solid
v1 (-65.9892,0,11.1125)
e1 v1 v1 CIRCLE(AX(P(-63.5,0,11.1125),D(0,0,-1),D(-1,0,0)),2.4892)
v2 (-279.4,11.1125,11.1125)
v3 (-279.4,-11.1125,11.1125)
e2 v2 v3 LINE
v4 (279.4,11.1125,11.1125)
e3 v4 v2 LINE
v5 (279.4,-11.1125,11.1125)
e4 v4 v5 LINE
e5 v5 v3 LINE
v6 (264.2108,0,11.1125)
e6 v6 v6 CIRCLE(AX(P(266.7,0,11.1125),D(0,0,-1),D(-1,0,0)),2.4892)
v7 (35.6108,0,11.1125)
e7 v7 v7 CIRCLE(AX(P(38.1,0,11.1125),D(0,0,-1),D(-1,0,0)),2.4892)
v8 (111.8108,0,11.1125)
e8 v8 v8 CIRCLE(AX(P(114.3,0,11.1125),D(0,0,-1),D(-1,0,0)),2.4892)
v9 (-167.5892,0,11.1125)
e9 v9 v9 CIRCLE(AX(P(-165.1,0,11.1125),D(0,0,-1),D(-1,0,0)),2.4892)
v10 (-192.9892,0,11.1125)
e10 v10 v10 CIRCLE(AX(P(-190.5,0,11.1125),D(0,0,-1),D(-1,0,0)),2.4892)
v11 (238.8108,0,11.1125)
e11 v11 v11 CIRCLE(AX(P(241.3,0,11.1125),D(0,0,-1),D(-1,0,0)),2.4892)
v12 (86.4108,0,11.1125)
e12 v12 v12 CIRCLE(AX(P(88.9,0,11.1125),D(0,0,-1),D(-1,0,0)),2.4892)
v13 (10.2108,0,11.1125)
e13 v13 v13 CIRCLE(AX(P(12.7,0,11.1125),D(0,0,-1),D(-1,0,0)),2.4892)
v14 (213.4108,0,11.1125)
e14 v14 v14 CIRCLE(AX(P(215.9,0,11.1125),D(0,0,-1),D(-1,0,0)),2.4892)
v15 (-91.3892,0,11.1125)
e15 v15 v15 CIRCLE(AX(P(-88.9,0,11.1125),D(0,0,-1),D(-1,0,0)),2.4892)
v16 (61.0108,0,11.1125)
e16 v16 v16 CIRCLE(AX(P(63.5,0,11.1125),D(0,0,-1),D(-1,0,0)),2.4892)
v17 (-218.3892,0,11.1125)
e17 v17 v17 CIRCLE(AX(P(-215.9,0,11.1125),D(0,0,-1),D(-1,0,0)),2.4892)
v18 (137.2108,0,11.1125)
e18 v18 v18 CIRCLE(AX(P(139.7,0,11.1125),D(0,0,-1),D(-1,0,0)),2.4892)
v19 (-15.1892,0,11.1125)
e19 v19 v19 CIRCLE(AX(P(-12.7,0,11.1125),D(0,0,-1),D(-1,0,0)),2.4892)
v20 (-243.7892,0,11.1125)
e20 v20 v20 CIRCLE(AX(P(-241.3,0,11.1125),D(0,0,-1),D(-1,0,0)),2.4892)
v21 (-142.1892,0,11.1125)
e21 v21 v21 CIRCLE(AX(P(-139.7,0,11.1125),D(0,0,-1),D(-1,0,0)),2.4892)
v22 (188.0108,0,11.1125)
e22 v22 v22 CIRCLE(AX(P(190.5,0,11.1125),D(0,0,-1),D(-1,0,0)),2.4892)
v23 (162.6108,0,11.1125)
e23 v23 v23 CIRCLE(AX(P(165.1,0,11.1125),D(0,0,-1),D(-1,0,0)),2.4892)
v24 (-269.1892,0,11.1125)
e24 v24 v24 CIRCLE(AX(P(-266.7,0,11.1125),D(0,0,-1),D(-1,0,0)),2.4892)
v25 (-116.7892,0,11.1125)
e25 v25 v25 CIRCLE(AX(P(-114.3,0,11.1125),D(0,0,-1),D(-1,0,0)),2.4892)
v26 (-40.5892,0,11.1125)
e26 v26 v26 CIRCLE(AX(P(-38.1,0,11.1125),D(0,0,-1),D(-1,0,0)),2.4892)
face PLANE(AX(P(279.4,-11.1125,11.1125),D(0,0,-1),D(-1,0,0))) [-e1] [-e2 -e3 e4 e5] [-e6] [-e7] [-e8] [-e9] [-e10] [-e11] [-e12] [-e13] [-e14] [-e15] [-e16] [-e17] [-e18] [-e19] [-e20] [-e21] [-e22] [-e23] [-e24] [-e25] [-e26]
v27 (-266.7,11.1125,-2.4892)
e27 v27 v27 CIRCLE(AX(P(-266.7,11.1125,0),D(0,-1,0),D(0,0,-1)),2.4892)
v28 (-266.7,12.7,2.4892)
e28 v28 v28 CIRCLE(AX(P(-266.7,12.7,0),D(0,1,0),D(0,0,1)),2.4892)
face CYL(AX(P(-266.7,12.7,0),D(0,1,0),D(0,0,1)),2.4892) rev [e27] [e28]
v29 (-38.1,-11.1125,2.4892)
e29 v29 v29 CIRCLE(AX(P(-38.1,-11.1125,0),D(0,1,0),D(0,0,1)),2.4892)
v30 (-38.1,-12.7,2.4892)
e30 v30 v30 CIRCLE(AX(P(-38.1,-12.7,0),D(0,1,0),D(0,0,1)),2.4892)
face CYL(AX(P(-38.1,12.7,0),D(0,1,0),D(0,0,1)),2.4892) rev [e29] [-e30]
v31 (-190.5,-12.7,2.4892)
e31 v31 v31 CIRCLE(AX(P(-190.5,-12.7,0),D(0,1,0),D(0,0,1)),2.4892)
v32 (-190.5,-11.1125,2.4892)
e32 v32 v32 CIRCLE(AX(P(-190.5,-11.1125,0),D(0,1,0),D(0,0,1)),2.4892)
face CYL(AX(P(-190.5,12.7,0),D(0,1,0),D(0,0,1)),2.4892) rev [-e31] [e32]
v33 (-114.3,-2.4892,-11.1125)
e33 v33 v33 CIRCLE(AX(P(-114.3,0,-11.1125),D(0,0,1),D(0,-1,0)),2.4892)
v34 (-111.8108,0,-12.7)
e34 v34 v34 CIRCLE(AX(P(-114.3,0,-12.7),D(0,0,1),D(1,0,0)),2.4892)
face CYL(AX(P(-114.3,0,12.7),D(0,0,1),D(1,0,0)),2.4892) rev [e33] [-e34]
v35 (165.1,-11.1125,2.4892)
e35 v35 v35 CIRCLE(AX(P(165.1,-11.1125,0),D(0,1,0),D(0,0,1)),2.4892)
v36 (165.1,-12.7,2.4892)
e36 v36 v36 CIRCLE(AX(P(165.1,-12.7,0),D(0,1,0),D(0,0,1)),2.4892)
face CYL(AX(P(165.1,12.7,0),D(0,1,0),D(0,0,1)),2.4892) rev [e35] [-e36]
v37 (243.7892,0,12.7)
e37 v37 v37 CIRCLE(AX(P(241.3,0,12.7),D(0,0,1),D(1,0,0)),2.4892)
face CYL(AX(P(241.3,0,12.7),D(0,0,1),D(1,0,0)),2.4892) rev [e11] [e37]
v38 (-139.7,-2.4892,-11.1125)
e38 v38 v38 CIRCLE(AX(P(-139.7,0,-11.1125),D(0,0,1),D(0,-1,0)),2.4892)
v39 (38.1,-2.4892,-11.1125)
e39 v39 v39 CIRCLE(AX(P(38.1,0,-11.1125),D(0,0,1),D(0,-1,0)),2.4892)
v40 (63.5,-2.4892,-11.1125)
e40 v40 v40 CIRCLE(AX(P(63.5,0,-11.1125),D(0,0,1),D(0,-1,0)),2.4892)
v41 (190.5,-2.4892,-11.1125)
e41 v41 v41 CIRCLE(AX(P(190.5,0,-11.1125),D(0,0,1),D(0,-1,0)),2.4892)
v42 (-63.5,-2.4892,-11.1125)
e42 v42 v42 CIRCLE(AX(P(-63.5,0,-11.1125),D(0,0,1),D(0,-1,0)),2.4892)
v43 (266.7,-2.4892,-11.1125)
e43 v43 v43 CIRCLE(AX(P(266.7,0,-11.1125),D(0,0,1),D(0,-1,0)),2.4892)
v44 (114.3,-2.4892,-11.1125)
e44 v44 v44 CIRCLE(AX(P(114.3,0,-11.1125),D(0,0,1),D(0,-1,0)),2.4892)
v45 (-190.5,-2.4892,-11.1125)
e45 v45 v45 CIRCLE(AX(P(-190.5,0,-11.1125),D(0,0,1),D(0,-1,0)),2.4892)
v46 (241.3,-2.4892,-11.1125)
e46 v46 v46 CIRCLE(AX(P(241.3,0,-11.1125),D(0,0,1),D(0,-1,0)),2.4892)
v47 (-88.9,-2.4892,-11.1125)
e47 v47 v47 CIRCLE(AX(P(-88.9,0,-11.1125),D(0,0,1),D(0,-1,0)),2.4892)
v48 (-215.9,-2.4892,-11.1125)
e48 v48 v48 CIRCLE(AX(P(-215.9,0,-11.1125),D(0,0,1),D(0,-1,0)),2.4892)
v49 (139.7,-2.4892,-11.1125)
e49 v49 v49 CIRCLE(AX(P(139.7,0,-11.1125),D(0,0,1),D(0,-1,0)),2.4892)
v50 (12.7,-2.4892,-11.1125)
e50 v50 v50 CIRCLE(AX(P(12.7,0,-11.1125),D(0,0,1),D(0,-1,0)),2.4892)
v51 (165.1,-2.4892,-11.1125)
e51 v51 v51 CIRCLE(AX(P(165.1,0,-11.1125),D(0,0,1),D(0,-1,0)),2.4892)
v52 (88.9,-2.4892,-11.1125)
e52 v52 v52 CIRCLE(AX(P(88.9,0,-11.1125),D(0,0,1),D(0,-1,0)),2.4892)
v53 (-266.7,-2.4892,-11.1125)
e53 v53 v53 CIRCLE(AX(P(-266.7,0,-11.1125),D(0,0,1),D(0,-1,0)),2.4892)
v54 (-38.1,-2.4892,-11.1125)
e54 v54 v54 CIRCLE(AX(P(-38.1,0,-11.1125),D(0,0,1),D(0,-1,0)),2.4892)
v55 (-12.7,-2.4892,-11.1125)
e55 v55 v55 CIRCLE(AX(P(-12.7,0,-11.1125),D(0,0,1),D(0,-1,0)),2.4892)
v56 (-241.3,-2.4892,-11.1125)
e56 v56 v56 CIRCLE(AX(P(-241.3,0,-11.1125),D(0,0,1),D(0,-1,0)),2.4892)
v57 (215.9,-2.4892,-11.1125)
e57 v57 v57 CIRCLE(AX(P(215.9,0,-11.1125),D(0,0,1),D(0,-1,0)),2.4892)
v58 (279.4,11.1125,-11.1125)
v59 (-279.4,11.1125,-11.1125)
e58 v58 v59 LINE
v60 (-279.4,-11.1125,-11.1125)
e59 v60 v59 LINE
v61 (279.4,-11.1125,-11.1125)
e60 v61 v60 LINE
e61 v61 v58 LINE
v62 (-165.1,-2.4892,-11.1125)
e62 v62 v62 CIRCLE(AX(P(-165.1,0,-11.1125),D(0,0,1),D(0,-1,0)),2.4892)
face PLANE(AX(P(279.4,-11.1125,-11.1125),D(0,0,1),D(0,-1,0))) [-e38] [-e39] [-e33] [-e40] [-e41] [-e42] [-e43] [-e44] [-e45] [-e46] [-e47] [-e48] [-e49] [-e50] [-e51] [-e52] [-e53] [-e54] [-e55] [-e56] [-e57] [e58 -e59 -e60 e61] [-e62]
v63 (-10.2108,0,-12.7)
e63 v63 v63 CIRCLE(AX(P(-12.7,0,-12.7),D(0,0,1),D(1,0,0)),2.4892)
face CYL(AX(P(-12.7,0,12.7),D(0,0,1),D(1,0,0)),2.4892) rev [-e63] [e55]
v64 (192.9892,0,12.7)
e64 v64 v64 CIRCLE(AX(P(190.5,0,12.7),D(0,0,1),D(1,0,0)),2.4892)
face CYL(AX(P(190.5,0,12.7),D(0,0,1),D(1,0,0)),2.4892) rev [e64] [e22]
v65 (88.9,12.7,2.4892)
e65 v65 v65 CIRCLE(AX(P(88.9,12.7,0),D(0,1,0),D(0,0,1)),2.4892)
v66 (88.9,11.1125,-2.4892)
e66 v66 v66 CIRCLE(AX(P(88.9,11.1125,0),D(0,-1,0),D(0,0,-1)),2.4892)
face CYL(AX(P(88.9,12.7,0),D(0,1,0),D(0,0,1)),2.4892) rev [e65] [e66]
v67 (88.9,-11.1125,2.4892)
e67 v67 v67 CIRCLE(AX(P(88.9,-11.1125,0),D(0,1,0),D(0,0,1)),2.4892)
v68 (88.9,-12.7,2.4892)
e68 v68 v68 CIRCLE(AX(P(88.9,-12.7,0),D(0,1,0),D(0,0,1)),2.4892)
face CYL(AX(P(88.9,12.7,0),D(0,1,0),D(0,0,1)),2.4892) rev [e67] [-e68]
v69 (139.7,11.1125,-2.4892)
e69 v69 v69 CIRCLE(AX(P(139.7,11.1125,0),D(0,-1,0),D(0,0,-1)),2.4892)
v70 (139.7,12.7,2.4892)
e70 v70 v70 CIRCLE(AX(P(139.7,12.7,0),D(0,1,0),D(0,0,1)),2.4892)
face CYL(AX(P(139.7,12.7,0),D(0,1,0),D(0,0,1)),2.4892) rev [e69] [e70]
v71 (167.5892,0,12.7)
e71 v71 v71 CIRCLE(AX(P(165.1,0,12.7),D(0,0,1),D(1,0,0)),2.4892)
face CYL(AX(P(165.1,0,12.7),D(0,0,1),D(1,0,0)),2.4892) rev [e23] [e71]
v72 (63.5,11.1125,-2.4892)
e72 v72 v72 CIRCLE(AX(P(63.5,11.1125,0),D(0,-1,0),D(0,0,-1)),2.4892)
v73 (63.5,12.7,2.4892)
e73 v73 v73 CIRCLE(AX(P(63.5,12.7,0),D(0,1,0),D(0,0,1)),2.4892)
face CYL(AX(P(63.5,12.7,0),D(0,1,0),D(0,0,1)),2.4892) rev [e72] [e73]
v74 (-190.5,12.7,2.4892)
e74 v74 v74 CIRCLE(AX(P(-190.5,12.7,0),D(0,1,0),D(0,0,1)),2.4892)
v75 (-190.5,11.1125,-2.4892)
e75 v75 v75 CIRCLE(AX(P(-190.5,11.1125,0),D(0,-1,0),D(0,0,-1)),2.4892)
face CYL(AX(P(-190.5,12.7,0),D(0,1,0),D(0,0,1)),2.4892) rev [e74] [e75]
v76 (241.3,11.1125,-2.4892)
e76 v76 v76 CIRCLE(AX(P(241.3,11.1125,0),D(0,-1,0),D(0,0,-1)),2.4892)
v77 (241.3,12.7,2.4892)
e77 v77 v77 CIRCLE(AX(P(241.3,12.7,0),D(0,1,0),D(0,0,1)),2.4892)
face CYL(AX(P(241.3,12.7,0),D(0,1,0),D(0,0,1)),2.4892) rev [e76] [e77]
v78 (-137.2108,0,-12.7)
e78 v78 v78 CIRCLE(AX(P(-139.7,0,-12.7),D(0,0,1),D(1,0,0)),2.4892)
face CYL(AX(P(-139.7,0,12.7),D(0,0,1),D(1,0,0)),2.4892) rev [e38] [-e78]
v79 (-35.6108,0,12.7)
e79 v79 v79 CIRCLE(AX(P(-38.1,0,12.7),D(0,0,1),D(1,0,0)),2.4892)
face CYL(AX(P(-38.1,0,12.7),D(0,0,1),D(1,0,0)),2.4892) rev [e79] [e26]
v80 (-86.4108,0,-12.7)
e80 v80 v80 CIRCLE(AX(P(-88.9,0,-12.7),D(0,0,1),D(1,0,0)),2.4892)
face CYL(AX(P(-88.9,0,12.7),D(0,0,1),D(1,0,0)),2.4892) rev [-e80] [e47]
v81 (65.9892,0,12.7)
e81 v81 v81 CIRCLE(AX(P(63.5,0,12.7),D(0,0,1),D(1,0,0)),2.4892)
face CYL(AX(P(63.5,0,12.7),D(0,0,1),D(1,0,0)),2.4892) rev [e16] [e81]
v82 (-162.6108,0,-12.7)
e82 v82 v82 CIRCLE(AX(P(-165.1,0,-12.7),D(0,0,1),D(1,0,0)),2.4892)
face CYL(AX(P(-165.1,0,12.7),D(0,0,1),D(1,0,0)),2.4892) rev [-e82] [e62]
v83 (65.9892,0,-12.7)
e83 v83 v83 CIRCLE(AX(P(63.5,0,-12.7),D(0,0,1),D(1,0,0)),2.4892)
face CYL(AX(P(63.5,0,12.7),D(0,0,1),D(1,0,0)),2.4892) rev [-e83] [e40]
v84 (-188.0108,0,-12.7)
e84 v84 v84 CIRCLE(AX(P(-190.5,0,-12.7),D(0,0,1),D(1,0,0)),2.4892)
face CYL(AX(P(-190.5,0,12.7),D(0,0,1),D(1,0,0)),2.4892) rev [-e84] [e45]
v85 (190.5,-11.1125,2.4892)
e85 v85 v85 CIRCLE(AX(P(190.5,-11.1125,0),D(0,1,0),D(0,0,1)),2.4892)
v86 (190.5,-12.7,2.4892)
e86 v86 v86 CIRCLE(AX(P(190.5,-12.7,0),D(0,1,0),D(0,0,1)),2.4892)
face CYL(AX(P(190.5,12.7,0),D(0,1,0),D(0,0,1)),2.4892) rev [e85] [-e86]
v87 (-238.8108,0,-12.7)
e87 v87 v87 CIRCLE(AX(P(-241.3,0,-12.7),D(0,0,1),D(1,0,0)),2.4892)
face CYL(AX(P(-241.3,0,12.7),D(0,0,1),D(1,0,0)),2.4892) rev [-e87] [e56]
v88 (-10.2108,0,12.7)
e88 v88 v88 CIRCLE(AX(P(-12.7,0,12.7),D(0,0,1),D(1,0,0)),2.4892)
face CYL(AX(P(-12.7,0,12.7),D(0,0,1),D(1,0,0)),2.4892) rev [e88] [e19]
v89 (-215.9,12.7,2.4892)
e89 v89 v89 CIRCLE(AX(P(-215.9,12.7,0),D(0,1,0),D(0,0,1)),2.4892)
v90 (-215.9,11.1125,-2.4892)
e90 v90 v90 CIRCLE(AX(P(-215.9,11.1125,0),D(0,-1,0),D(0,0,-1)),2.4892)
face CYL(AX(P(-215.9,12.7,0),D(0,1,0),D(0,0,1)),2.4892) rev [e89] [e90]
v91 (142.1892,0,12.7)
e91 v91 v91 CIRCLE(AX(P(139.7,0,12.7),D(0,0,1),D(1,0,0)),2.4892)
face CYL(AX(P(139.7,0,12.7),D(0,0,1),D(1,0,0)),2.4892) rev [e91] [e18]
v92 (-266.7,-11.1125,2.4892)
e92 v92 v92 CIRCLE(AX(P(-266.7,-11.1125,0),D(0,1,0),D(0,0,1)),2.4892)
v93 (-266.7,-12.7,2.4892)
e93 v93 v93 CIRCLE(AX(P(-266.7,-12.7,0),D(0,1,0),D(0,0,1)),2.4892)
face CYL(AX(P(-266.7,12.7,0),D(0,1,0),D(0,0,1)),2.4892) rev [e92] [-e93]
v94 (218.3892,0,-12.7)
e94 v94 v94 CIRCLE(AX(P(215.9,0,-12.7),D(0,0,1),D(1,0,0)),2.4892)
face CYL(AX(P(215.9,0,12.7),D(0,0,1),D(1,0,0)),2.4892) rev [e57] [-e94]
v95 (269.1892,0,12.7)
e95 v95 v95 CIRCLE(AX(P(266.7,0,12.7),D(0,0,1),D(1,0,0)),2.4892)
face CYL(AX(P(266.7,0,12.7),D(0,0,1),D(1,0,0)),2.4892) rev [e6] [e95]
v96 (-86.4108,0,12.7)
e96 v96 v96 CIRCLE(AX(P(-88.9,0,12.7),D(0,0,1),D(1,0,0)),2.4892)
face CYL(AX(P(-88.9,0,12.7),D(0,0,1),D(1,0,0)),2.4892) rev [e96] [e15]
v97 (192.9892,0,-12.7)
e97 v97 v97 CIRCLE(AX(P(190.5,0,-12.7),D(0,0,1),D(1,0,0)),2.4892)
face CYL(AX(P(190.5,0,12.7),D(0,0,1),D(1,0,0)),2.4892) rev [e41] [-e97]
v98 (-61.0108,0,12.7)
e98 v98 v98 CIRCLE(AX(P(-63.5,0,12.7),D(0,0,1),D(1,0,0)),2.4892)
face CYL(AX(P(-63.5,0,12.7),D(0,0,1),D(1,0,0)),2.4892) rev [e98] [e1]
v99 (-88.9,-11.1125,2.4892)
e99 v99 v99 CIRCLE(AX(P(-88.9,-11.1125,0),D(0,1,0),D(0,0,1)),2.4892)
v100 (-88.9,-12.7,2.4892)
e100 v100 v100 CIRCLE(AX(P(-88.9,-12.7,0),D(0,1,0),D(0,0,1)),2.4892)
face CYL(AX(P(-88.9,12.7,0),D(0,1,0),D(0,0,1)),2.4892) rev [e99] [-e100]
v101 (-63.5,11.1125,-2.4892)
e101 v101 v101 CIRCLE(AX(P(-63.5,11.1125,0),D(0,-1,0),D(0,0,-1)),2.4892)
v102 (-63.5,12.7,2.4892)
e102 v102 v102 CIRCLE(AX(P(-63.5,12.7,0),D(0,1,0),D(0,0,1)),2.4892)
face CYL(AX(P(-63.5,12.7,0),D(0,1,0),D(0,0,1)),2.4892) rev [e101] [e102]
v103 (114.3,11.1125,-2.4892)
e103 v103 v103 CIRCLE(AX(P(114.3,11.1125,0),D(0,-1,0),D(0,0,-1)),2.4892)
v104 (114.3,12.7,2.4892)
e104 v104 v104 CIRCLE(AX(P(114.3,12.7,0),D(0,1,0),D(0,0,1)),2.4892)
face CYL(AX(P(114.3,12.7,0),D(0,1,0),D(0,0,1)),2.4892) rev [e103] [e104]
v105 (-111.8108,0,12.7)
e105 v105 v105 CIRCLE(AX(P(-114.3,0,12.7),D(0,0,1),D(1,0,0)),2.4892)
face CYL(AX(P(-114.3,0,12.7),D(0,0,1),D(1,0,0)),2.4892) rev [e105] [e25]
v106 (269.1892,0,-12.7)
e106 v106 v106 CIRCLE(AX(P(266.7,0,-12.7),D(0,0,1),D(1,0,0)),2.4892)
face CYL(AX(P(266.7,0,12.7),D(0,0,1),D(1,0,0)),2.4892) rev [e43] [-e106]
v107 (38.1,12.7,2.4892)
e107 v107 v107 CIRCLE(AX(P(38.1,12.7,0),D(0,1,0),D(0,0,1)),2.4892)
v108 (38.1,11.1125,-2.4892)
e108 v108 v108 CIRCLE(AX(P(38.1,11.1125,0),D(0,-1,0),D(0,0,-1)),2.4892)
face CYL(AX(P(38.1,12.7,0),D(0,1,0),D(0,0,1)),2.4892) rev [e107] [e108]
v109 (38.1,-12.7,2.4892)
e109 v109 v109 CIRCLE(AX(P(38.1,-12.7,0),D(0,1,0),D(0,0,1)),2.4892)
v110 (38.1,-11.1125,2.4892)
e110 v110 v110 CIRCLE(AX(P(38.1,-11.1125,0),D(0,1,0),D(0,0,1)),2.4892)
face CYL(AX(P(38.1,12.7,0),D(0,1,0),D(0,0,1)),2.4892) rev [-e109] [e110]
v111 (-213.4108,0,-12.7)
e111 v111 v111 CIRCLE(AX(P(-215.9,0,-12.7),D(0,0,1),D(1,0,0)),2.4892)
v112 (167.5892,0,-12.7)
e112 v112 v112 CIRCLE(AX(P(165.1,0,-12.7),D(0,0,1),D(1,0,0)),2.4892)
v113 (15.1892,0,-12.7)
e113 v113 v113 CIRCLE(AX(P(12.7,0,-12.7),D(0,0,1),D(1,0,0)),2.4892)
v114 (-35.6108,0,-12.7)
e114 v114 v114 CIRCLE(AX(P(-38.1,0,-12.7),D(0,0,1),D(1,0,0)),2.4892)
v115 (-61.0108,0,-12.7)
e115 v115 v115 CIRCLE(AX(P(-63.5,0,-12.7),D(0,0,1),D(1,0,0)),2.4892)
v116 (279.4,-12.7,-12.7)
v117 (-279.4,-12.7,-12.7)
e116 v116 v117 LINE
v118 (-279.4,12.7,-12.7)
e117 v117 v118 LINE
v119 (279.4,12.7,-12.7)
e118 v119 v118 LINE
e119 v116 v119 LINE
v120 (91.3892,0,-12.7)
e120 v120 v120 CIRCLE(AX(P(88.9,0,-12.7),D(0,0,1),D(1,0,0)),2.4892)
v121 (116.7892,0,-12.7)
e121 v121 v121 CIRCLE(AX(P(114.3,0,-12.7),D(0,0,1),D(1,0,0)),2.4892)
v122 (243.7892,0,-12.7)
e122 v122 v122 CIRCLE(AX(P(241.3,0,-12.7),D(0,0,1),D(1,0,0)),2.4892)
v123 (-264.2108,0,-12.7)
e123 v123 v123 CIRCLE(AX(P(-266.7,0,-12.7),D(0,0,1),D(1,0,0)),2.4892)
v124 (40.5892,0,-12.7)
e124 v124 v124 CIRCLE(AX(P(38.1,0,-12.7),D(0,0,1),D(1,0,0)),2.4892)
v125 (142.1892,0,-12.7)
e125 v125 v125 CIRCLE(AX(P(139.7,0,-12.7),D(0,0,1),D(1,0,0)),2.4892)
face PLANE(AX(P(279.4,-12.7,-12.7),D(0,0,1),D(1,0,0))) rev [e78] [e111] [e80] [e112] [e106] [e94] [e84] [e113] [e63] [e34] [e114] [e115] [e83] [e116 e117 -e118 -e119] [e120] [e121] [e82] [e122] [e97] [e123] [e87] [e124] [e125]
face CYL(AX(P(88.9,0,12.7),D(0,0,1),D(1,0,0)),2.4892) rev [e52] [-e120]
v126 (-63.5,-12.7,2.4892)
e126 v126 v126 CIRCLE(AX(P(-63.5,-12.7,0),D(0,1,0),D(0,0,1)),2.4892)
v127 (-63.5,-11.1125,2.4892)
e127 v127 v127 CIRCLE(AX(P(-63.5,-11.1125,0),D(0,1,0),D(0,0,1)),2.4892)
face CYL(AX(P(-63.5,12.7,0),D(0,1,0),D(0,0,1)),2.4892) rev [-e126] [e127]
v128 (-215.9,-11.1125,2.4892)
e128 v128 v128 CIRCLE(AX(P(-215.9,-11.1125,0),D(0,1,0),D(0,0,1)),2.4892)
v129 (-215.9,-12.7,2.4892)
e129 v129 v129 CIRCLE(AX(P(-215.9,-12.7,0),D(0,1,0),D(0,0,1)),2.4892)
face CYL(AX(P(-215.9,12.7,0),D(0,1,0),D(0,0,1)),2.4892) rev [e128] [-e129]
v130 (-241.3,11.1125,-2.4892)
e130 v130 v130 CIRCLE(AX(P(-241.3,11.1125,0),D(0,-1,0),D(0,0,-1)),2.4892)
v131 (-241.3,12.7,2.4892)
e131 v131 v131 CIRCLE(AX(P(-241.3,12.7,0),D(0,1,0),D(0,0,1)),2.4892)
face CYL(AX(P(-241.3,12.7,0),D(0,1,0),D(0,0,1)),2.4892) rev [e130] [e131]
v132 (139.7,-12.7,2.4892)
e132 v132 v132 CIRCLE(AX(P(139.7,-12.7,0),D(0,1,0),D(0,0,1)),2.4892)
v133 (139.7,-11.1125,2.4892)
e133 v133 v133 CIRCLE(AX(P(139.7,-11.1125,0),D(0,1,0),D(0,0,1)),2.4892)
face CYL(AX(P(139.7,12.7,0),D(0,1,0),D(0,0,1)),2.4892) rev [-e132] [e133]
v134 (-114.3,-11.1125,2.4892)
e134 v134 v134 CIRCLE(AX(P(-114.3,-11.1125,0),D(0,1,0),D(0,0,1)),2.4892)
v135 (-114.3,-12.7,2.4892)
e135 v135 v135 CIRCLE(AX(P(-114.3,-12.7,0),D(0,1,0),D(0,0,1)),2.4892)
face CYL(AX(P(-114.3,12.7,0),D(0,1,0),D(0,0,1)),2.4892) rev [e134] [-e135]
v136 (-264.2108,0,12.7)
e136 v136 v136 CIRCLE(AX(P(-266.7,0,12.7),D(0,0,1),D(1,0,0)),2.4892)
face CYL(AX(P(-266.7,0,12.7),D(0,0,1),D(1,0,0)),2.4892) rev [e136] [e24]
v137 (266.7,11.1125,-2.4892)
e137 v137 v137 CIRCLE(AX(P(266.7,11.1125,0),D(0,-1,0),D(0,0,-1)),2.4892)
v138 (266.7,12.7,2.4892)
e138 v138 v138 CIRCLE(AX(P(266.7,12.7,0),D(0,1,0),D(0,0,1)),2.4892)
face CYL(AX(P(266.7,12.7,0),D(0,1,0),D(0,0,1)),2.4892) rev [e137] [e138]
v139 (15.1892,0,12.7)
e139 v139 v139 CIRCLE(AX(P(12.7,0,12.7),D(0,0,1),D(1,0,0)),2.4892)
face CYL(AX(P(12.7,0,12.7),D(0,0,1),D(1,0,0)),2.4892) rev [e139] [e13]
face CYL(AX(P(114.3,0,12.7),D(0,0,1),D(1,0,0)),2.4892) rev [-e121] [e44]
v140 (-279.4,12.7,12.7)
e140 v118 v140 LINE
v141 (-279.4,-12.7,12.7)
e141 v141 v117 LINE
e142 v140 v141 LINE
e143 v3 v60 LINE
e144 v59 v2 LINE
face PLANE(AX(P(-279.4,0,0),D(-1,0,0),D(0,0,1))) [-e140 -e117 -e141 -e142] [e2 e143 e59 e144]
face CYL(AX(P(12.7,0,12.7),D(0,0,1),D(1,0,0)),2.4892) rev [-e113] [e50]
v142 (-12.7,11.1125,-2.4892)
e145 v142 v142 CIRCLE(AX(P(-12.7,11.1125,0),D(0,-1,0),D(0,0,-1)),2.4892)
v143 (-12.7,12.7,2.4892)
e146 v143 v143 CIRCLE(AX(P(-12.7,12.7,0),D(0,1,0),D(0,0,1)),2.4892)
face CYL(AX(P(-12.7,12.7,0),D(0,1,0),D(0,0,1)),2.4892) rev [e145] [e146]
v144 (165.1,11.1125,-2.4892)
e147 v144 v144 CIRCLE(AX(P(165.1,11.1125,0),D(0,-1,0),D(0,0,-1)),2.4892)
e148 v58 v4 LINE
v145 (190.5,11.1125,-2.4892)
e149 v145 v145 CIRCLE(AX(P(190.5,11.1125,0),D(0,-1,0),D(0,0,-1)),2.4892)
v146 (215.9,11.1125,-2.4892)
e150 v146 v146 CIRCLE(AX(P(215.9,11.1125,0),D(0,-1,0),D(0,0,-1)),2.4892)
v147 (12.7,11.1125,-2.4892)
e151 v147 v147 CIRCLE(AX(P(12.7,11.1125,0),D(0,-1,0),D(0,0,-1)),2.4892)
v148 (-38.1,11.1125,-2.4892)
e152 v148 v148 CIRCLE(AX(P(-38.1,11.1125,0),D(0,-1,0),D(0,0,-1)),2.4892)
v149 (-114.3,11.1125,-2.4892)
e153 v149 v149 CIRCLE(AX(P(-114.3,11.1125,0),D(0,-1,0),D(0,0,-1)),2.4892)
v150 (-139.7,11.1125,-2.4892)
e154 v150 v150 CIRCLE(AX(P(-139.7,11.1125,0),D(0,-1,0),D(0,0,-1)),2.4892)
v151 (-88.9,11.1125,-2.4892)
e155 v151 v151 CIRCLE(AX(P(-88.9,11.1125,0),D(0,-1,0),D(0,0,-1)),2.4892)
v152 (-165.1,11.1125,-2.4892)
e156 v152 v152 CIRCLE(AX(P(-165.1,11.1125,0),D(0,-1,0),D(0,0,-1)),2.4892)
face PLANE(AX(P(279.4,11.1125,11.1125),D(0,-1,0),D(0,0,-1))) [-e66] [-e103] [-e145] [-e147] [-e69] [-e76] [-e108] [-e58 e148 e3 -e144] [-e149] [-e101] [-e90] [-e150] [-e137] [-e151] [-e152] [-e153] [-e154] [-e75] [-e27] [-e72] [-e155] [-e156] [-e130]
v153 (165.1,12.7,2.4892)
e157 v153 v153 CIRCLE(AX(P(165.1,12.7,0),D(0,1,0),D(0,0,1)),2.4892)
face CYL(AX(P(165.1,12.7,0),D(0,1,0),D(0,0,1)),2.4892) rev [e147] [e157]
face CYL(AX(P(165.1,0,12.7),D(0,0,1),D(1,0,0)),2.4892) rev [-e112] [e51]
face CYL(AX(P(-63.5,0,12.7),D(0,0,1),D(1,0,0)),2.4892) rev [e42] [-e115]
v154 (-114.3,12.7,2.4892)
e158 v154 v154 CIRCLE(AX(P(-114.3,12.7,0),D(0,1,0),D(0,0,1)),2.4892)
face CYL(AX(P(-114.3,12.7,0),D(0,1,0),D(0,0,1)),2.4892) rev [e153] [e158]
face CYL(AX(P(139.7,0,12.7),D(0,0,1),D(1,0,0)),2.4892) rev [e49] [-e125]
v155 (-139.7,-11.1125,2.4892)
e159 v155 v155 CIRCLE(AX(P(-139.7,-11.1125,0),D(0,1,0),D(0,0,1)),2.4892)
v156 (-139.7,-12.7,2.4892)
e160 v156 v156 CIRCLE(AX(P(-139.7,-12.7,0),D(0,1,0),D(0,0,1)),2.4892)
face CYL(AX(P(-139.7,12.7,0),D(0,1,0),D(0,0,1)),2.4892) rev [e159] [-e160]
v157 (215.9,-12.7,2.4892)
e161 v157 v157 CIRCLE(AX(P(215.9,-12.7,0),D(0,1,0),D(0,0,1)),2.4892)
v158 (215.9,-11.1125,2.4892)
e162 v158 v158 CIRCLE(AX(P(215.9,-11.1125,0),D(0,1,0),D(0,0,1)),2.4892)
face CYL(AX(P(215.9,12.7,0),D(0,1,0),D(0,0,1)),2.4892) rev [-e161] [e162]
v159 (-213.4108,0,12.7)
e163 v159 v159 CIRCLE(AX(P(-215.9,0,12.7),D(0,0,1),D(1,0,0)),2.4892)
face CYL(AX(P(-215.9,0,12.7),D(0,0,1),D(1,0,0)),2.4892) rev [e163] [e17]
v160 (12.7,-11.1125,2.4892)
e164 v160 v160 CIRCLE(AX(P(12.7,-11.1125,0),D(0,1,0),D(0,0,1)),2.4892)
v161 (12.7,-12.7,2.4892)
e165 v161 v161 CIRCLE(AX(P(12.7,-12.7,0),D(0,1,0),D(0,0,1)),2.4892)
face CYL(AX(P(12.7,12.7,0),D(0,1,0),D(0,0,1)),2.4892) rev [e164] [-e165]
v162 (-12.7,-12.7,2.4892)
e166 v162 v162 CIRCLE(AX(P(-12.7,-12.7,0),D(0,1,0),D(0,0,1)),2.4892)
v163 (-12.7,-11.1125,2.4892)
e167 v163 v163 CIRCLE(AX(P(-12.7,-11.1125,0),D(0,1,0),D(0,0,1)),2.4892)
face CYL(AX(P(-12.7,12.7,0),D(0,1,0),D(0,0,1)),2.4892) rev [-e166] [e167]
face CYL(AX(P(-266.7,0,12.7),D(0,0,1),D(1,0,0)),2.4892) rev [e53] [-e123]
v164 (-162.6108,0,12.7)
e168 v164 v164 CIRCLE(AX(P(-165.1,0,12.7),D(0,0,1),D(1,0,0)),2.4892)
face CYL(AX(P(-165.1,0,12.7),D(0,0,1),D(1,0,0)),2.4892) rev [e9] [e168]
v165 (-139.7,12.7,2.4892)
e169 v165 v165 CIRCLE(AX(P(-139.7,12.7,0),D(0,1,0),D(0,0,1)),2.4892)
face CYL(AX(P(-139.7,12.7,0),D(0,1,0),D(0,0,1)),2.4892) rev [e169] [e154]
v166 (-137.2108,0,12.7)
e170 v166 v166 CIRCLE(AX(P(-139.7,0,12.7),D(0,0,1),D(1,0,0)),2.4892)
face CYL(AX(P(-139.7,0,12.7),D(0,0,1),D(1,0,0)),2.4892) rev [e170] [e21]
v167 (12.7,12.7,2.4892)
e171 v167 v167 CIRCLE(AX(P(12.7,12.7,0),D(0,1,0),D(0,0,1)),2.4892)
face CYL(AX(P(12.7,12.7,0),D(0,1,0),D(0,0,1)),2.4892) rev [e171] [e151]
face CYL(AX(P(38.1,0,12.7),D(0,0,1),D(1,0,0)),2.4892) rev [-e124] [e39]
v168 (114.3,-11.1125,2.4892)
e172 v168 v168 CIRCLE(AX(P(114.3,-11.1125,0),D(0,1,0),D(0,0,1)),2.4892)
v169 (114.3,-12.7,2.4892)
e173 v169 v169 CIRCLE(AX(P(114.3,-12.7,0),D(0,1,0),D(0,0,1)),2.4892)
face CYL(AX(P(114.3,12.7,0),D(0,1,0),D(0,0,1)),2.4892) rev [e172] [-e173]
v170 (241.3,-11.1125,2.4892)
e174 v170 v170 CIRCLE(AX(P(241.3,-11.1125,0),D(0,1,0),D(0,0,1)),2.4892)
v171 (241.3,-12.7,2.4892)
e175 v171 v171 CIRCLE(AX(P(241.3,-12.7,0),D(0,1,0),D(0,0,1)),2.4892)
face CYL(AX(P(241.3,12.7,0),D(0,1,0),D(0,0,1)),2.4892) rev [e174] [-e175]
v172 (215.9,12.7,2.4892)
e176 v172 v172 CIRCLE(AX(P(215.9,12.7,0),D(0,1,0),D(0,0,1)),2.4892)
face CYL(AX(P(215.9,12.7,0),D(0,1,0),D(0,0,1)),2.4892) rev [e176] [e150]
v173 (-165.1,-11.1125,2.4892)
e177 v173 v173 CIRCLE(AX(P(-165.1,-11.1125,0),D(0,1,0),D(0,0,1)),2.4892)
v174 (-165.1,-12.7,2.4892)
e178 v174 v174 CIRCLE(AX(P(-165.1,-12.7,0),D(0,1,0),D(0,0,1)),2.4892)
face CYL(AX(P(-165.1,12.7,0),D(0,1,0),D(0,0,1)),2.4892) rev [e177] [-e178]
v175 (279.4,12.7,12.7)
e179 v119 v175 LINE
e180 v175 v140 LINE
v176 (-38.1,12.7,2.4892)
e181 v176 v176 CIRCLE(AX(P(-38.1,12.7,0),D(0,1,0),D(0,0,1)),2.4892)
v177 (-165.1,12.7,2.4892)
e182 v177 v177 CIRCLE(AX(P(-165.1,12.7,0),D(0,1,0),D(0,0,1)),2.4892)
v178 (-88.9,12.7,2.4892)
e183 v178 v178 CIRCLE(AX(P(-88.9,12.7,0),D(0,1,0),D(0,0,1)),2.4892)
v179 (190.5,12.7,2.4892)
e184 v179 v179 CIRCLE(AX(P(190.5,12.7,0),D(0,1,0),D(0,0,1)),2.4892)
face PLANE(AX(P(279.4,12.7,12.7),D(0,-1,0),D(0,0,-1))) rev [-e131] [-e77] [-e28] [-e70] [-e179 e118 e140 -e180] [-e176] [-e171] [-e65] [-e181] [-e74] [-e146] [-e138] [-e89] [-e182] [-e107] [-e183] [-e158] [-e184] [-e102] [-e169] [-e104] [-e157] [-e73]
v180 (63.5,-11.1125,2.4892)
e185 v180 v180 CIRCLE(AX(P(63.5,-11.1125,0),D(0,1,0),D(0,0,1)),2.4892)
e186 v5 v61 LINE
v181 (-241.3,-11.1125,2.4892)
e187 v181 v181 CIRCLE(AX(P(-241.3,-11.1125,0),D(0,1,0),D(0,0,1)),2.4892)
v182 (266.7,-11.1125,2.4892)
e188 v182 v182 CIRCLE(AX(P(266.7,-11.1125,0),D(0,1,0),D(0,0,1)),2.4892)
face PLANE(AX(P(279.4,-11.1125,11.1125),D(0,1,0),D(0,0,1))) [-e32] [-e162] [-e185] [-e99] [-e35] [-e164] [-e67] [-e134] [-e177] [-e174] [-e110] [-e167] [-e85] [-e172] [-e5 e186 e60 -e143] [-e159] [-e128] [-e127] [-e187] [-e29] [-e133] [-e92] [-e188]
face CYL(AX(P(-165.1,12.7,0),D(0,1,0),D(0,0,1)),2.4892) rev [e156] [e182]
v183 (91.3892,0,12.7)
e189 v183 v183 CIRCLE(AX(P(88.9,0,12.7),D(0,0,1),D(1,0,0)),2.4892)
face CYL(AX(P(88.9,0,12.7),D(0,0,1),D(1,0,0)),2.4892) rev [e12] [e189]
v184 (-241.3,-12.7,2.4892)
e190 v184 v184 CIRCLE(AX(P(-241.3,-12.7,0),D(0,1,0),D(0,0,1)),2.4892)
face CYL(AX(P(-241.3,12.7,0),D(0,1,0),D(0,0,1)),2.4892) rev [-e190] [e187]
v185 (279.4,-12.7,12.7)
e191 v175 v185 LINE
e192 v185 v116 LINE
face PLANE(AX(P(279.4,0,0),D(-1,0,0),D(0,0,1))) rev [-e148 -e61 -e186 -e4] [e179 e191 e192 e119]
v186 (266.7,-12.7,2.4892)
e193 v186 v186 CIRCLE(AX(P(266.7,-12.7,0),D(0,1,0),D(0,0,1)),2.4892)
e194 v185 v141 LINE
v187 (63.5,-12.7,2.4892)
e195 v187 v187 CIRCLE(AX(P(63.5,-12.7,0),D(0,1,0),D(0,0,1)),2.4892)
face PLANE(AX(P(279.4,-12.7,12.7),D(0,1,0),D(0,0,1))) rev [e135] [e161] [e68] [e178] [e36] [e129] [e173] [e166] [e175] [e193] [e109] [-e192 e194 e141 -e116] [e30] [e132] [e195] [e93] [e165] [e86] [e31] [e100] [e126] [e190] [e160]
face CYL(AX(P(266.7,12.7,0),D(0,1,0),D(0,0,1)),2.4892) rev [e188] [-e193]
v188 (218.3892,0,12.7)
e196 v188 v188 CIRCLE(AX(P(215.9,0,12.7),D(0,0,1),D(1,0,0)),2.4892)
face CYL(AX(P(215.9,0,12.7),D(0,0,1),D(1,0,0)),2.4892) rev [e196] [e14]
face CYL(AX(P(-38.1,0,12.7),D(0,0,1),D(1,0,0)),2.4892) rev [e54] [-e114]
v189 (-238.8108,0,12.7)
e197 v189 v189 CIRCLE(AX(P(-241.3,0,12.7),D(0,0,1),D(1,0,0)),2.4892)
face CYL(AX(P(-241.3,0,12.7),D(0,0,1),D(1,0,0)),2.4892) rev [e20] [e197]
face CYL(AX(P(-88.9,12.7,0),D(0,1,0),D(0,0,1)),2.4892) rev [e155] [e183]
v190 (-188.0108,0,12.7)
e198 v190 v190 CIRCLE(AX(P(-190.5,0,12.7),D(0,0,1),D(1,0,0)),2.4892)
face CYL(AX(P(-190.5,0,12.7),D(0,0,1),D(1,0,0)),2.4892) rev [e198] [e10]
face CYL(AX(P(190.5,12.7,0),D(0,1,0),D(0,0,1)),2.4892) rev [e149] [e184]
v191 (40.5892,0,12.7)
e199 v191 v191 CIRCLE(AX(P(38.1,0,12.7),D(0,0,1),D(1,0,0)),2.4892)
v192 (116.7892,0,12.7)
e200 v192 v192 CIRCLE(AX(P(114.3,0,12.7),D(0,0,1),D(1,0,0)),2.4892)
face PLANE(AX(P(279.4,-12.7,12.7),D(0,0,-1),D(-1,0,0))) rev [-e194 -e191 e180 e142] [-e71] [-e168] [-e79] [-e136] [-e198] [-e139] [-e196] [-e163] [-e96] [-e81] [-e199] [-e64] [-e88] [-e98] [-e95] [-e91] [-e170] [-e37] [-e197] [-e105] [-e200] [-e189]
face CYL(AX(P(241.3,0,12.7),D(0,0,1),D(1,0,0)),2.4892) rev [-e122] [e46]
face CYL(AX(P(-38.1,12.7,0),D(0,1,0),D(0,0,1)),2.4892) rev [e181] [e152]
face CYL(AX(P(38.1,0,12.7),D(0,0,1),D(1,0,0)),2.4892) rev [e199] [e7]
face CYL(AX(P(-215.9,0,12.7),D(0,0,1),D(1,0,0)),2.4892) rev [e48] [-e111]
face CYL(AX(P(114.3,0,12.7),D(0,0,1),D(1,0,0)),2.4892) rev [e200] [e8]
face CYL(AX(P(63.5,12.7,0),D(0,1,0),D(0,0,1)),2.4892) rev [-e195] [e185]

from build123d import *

# Parameters (mm, degrees)
SKETCH1_W             = 25.4
SKETCH1_H             = 25.4
SKETCH1_W_2           = 22.225
SKETCH1_H_2           = 22.225
BOSS_EXTRUDE1_DEPTH   = 279.4
SKETCH3_W             = 2.4892
SKETCH3_H             = 25.4
SKETCH3_AT_POINT_2_W  = 2.4892
SKETCH3_AT_POINT_2_H  = 25.4
LPATTERN1_START       = -12.7
LPATTERN1_OUTLINE_R   = 2.4892
LPATTERN1_DEPTH       = 25.4
LPATTERN1_2_OUTLINE_R = 2.4892
LPATTERN1_2_DEPTH     = 25.4


# Read off the part's stored shape, not the designer's step: LPattern1
with BuildPart() as part:
    # Sketch1 → Boss-Extrude1 (new, symmetric)
    with BuildSketch(Plane(origin=(0, 0, 0), x_dir=(0, 0, -1), z_dir=(1, 0, 0))):
        Rectangle(SKETCH1_W, SKETCH1_H)
        Rectangle(SKETCH1_W_2, SKETCH1_H_2, mode=Mode.SUBTRACT)
    extrude(amount=BOSS_EXTRUDE1_DEPTH, both=True)

    # Sketch3 → #9 (0.196) Diameter Hole1 (revolve, cut)
    with BuildSketch(Plane(origin=(266.7, 12.7, 0), x_dir=(0, 0, 1), z_dir=(1, 0, 0))):
        with Locations((1.2446, 12.7)):
            Rectangle(SKETCH3_W, SKETCH3_H)
    revolve(axis=Axis((266.7, 19.05, 0), (0, -1, 0)), mode=Mode.SUBTRACT)

    # Sketch3 at point 2 (carried to point 2, square into its face) → #9 (0.196) Diameter Hole1 at 2 (revolve, cut)
    with BuildSketch(Plane(origin=(266.7, 0, 12.7), x_dir=(0, -1, 0), z_dir=(1, 0, 0))):
        with Locations((1.2446, 12.7)):
            Rectangle(SKETCH3_AT_POINT_2_W, SKETCH3_AT_POINT_2_H)
    revolve(axis=Axis((266.7, 0, 19.05), (0, 0, -1)), mode=Mode.SUBTRACT)

    # LPattern1 outline → LPattern1 (cut)
    with BuildSketch(Plane.XY.offset(LPATTERN1_START)):
        with Locations((241.3, 0)):
            Circle(LPATTERN1_OUTLINE_R)
        with Locations((215.9, 0)):
            Circle(LPATTERN1_OUTLINE_R)
        with Locations((190.5, 0)):
            Circle(LPATTERN1_OUTLINE_R)
        with Locations((165.1, 0)):
            Circle(LPATTERN1_OUTLINE_R)
        with Locations((139.7, 0)):
            Circle(LPATTERN1_OUTLINE_R)
        with Locations((114.3, 0)):
            Circle(LPATTERN1_OUTLINE_R)
        with Locations((88.9, 0)):
            Circle(LPATTERN1_OUTLINE_R)
        with Locations((63.5, 0)):
            Circle(LPATTERN1_OUTLINE_R)
        with Locations((38.1, 0)):
            Circle(LPATTERN1_OUTLINE_R)
        with Locations((12.7, 0)):
            Circle(LPATTERN1_OUTLINE_R)
        with Locations((-12.7, 0)):
            Circle(LPATTERN1_OUTLINE_R)
        with Locations((-38.1, 0)):
            Circle(LPATTERN1_OUTLINE_R)
        with Locations((-63.5, 0)):
            Circle(LPATTERN1_OUTLINE_R)
        with Locations((-88.9, 0)):
            Circle(LPATTERN1_OUTLINE_R)
        with Locations((-114.3, 0)):
            Circle(LPATTERN1_OUTLINE_R)
        with Locations((-139.7, 0)):
            Circle(LPATTERN1_OUTLINE_R)
        with Locations((-165.1, 0)):
            Circle(LPATTERN1_OUTLINE_R)
        with Locations((-190.5, 0)):
            Circle(LPATTERN1_OUTLINE_R)
        with Locations((-215.9, 0)):
            Circle(LPATTERN1_OUTLINE_R)
        with Locations((-241.3, 0)):
            Circle(LPATTERN1_OUTLINE_R)
        with Locations((-266.7, 0)):
            Circle(LPATTERN1_OUTLINE_R)
    extrude(amount=LPATTERN1_DEPTH, mode=Mode.SUBTRACT)

    # LPattern1 2 outline → LPattern1 2 (cut)
    with BuildSketch(Plane(origin=(0, 0, 0), x_dir=(1, 0, 0), z_dir=(0, 1, 0)).offset(LPATTERN1_START)):
        with Locations((241.3, 0)):
            Circle(LPATTERN1_2_OUTLINE_R)
        with Locations((215.9, 0)):
            Circle(LPATTERN1_2_OUTLINE_R)
        with Locations((190.5, 0)):
            Circle(LPATTERN1_2_OUTLINE_R)
        with Locations((165.1, 0)):
            Circle(LPATTERN1_2_OUTLINE_R)
        with Locations((139.7, 0)):
            Circle(LPATTERN1_2_OUTLINE_R)
        with Locations((114.3, 0)):
            Circle(LPATTERN1_2_OUTLINE_R)
        with Locations((88.9, 0)):
            Circle(LPATTERN1_2_OUTLINE_R)
        with Locations((63.5, 0)):
            Circle(LPATTERN1_2_OUTLINE_R)
        with Locations((38.1, 0)):
            Circle(LPATTERN1_2_OUTLINE_R)
        with Locations((12.7, 0)):
            Circle(LPATTERN1_2_OUTLINE_R)
        with Locations((-12.7, 0)):
            Circle(LPATTERN1_2_OUTLINE_R)
        with Locations((-38.1, 0)):
            Circle(LPATTERN1_2_OUTLINE_R)
        with Locations((-63.5, 0)):
            Circle(LPATTERN1_2_OUTLINE_R)
        with Locations((-88.9, 0)):
            Circle(LPATTERN1_2_OUTLINE_R)
        with Locations((-114.3, 0)):
            Circle(LPATTERN1_2_OUTLINE_R)
        with Locations((-139.7, 0)):
            Circle(LPATTERN1_2_OUTLINE_R)
        with Locations((-165.1, 0)):
            Circle(LPATTERN1_2_OUTLINE_R)
        with Locations((-190.5, 0)):
            Circle(LPATTERN1_2_OUTLINE_R)
        with Locations((-215.9, 0)):
            Circle(LPATTERN1_2_OUTLINE_R)
        with Locations((-241.3, 0)):
            Circle(LPATTERN1_2_OUTLINE_R)
        with Locations((-266.7, 0)):
            Circle(LPATTERN1_2_OUTLINE_R)
    extrude(amount=LPATTERN1_2_DEPTH, mode=Mode.SUBTRACT)


solid = part.part
